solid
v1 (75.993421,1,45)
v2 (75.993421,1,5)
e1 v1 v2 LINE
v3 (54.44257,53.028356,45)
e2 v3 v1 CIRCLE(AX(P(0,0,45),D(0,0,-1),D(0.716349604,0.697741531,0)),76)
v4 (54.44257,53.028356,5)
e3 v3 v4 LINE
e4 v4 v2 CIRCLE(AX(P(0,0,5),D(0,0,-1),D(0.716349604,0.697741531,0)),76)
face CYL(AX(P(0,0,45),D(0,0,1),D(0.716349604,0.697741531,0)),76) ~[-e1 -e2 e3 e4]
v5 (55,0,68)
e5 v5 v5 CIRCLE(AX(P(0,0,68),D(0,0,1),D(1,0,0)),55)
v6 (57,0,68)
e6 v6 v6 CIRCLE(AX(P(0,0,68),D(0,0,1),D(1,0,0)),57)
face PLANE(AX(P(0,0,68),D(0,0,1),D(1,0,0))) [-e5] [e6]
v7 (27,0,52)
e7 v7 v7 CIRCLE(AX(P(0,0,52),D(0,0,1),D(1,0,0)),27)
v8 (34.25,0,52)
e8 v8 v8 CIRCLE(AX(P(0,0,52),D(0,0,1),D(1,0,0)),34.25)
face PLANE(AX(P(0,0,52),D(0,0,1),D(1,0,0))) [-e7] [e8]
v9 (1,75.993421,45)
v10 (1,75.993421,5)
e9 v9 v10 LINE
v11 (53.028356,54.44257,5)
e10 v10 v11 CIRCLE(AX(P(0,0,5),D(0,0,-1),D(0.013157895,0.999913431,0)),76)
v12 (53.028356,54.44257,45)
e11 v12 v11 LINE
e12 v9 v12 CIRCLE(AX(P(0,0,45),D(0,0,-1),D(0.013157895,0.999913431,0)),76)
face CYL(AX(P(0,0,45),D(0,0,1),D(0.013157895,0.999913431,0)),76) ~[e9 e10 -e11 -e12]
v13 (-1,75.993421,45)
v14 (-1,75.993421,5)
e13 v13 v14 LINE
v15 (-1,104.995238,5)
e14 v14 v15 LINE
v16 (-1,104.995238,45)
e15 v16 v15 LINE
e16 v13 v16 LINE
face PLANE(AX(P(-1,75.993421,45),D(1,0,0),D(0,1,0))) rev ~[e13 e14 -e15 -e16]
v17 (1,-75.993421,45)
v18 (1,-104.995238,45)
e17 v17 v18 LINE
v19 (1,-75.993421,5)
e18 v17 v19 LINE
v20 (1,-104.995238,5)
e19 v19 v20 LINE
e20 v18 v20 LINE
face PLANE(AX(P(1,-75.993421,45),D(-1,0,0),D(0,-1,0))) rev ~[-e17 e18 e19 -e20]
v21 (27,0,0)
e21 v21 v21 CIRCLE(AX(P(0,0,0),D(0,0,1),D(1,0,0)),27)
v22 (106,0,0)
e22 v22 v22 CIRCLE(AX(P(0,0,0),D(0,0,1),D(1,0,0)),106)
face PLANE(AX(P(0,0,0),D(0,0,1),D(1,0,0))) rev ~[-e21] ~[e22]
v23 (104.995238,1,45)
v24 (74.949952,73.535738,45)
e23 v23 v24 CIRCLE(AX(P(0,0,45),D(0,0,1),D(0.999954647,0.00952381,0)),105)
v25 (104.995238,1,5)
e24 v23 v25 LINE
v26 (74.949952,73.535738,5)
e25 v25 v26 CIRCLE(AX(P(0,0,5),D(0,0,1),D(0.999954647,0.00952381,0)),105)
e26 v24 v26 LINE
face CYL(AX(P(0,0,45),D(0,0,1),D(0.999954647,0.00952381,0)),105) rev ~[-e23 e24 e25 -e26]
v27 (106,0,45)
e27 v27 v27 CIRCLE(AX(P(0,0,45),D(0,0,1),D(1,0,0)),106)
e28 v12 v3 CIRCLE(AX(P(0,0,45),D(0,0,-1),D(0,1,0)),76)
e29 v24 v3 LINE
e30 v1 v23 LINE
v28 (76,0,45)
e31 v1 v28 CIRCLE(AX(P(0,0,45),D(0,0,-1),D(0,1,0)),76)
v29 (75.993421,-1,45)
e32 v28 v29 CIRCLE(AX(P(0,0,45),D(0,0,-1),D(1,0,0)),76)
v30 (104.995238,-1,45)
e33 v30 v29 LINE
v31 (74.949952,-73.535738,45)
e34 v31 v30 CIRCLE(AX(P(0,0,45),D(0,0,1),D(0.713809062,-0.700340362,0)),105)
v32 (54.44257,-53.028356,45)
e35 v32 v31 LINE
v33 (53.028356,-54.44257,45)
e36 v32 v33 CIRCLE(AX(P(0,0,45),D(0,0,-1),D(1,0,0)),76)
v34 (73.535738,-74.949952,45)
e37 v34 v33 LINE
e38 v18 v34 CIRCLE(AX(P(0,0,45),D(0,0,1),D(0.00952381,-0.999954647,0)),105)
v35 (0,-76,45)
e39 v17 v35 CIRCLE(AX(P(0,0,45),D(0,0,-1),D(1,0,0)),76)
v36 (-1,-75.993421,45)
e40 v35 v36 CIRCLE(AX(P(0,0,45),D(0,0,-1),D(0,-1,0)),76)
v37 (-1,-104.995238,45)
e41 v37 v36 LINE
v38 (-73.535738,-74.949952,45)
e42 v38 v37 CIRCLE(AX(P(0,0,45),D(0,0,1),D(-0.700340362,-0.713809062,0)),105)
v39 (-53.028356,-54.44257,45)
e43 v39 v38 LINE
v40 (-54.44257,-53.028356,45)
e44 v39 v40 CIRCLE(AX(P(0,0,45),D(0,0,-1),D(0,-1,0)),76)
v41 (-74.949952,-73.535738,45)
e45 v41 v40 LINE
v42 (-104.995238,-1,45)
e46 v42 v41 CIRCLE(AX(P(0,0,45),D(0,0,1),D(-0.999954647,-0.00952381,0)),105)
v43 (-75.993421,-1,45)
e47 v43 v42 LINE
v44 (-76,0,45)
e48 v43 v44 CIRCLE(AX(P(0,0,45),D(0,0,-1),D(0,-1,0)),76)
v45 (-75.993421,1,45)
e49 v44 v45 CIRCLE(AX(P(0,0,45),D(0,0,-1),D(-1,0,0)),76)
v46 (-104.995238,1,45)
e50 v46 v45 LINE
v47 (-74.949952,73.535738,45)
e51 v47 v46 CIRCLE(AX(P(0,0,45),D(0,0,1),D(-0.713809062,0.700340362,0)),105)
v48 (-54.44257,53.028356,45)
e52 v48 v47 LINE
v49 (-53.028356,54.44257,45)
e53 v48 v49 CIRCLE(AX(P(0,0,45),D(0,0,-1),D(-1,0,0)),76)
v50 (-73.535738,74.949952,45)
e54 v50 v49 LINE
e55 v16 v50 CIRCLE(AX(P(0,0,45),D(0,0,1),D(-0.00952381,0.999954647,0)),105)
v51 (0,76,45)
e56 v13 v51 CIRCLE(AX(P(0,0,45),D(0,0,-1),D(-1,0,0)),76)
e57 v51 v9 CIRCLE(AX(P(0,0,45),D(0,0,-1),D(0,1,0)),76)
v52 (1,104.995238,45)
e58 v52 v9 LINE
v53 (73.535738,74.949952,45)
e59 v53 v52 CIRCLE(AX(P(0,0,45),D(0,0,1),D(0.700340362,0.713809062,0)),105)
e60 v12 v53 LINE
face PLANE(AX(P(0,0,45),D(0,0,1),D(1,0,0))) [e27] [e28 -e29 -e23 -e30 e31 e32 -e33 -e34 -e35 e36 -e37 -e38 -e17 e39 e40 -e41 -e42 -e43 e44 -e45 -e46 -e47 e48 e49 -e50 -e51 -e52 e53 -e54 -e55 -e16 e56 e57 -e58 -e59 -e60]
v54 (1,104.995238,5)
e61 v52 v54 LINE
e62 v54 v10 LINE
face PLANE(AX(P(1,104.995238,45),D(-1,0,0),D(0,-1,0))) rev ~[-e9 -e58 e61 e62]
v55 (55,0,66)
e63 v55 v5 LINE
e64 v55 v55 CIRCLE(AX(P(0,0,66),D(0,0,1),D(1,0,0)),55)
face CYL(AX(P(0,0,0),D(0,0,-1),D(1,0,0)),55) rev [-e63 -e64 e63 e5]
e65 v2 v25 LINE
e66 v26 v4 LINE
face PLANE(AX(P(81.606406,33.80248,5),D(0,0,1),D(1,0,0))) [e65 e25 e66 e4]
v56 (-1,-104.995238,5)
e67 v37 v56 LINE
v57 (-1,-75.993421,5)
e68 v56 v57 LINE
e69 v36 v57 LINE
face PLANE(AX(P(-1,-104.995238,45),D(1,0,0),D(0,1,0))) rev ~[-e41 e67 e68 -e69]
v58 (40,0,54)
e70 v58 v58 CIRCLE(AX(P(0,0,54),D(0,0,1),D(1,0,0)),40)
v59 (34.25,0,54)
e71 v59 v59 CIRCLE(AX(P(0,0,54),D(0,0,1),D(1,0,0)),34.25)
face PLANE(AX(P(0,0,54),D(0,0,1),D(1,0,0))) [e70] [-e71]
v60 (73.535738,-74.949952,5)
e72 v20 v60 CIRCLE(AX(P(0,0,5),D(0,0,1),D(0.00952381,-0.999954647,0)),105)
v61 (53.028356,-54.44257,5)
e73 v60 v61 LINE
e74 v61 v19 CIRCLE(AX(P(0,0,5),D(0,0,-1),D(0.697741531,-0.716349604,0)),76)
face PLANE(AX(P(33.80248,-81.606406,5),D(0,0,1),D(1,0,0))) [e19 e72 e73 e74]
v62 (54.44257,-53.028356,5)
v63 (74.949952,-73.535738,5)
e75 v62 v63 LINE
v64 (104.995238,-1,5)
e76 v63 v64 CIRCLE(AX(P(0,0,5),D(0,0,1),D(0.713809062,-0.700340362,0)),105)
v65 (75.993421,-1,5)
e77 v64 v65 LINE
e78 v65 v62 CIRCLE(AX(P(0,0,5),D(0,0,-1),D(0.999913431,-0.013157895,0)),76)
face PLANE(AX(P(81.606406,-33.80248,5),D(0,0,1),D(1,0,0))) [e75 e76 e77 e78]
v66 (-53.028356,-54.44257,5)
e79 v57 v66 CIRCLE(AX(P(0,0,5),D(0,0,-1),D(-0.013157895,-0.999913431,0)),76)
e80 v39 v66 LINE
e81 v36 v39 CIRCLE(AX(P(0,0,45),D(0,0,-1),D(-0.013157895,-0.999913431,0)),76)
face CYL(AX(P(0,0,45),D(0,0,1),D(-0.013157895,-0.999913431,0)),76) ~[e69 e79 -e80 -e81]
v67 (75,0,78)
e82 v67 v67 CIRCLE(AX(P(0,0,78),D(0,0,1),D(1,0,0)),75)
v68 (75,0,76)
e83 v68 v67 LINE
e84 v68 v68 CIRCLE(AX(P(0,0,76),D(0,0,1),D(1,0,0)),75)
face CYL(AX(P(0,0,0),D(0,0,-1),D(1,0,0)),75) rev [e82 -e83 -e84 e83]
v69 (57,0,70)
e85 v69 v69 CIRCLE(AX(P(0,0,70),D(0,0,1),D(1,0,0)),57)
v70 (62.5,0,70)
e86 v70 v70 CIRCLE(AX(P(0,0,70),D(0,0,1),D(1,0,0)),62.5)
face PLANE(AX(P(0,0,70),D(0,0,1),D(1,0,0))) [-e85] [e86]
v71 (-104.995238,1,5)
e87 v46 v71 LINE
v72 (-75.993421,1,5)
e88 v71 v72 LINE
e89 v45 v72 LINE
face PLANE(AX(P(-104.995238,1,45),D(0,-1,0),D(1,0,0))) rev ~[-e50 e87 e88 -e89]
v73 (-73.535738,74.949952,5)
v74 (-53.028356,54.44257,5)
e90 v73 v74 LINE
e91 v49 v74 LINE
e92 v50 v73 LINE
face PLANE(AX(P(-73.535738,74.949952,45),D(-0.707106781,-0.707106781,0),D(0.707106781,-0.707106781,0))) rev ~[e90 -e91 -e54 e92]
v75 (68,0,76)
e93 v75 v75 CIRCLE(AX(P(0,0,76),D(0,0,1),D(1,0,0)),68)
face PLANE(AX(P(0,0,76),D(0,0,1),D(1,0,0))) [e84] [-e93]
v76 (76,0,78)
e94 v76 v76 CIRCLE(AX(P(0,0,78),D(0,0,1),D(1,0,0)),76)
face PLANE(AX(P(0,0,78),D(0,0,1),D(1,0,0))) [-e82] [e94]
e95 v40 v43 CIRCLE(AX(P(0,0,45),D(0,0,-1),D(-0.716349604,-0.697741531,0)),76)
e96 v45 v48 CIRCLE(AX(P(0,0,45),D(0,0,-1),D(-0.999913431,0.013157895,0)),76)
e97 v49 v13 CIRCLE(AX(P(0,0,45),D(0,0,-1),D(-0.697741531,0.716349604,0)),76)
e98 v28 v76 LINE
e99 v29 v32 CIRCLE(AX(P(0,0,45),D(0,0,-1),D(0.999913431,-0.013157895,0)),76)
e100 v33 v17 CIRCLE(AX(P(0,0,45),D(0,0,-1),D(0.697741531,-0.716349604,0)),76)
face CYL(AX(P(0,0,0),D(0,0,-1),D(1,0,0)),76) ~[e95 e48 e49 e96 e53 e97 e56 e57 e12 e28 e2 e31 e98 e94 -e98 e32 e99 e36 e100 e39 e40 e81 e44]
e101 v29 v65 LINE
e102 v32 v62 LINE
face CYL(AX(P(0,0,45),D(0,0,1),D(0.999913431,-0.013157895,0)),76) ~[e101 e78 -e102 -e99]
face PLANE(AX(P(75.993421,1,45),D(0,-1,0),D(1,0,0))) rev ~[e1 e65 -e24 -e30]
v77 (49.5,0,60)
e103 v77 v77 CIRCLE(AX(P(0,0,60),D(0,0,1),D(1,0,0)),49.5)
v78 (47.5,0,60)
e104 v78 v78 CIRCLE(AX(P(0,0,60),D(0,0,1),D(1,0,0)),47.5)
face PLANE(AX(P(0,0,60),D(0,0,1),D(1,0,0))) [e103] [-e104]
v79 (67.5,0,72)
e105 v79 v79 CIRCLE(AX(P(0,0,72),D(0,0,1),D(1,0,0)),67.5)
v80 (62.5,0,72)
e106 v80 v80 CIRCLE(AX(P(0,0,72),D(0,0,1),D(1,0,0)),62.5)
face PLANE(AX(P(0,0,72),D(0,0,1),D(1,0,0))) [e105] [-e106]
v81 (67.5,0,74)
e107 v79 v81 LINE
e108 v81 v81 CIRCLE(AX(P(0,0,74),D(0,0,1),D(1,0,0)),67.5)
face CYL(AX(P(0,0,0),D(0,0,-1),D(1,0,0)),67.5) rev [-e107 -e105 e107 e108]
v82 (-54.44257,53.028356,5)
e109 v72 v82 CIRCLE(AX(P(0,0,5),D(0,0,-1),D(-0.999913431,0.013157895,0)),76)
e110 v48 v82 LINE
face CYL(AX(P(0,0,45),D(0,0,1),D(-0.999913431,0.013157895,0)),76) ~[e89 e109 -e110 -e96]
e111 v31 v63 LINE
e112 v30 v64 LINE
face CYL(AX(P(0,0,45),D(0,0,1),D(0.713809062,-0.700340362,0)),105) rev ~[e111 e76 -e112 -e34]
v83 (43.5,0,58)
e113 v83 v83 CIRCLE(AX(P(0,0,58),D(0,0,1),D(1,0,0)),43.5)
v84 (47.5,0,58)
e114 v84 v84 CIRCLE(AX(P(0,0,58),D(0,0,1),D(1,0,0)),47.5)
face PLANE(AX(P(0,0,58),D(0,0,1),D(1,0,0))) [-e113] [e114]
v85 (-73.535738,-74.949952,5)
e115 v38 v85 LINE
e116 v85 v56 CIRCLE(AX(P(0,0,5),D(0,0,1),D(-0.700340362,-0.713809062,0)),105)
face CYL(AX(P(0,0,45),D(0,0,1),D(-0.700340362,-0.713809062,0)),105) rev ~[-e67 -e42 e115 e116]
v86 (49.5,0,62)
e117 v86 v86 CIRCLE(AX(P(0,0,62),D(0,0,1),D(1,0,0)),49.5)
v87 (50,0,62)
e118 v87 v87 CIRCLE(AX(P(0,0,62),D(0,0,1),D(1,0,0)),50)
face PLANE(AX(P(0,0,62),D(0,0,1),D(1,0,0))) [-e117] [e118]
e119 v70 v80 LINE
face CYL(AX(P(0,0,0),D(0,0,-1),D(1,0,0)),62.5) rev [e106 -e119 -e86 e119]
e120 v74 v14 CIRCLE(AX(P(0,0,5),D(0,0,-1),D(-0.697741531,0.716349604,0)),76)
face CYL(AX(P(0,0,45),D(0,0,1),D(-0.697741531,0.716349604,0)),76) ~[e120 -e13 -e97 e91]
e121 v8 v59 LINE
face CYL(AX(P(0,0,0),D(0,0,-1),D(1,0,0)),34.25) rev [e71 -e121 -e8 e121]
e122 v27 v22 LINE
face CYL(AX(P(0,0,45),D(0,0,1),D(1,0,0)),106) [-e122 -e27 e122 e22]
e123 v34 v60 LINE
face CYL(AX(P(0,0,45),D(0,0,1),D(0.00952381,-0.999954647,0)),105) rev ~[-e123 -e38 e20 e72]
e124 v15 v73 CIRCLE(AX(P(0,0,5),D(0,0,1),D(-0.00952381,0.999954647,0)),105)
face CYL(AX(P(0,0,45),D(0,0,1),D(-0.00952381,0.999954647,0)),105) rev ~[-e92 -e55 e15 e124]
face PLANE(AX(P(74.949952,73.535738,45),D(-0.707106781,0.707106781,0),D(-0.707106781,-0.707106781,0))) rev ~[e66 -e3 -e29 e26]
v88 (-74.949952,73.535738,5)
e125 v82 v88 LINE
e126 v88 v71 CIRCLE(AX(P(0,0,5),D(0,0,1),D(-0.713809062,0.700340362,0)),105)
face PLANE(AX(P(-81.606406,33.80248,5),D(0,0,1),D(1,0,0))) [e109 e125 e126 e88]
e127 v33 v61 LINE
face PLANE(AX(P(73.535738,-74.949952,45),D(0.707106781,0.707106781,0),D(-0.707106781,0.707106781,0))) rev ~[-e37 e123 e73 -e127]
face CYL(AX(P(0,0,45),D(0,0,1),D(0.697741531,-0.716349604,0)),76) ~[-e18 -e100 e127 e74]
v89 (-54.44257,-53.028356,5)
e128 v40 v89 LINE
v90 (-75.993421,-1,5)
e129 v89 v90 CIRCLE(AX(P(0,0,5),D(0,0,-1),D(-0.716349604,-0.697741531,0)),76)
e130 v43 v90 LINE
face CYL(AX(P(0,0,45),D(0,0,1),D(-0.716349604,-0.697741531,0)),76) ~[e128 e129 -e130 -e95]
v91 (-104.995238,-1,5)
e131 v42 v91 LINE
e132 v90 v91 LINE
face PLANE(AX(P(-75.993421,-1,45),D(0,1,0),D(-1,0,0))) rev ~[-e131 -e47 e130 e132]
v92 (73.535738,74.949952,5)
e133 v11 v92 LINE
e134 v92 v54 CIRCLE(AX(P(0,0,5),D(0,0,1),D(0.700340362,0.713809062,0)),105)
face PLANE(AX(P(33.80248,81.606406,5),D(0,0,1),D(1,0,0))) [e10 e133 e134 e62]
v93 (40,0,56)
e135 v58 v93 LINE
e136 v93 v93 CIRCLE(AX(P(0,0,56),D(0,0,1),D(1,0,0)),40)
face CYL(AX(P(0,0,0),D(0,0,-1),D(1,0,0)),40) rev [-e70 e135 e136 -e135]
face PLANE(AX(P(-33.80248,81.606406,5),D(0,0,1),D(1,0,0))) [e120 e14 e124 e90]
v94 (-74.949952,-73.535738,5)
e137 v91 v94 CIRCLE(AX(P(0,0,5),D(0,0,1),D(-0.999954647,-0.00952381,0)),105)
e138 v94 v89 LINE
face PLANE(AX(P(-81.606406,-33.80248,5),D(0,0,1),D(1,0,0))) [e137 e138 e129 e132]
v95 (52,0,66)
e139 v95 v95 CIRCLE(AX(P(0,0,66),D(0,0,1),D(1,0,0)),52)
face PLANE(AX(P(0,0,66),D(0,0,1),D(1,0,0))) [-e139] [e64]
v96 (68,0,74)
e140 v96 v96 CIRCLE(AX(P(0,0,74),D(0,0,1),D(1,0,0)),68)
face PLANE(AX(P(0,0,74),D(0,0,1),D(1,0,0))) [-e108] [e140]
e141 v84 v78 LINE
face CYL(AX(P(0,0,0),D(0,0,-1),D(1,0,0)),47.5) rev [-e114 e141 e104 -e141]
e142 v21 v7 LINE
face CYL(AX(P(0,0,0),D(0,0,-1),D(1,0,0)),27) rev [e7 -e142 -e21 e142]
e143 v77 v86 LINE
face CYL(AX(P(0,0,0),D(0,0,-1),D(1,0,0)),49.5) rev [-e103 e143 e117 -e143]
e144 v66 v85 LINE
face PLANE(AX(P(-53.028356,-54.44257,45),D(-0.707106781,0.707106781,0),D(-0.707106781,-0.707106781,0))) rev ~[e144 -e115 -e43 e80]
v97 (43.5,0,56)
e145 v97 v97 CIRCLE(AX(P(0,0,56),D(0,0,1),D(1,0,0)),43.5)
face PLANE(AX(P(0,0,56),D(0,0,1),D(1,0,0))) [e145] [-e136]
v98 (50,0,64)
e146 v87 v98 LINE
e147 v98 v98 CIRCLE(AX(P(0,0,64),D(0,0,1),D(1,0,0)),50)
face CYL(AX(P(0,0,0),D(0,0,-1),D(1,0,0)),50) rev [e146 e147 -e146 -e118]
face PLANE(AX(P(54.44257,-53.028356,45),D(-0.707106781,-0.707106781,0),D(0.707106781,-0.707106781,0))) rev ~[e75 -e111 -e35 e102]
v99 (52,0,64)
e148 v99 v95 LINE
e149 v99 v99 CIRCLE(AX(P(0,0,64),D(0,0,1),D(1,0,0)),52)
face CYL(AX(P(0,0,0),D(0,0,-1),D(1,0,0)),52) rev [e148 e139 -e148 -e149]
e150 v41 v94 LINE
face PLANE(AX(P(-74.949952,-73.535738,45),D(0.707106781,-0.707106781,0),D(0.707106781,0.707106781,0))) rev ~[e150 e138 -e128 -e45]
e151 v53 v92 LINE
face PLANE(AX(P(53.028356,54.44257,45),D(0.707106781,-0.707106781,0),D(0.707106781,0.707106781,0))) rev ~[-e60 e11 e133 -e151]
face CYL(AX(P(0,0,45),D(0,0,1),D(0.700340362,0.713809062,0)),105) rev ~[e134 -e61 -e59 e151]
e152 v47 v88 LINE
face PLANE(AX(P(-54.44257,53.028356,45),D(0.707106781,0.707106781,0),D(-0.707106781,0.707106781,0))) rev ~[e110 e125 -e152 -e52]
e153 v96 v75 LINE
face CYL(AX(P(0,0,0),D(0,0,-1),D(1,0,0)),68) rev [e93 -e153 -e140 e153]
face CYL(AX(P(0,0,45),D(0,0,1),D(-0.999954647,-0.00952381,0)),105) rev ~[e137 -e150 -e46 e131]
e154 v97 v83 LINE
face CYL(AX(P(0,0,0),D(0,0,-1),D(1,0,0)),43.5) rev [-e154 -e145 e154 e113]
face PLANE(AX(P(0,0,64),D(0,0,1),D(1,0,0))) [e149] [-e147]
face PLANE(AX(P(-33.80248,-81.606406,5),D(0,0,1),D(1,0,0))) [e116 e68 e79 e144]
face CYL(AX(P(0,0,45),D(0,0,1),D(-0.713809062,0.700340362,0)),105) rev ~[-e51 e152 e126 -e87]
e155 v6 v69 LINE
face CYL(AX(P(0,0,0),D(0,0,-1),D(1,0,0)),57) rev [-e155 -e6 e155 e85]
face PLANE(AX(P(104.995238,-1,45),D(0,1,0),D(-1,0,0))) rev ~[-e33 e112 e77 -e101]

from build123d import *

# Parameters (mm, degrees)
F0_R      = 34.25
F0_R_2    = 27
F1_DEPTH  = 52
F2_R      = 40
F2_R_2    = 34.25
F3_DEPTH  = 54
F4_R      = 43.5
F4_R_2    = 40
F5_DEPTH  = 56
F6_R      = 47.5
F6_R_2    = 43.5
F7_DEPTH  = 58
F8_R      = 49.5
F8_R_2    = 47.5
F9_DEPTH  = 60
F10_R     = 50
F10_R_2   = 49.5
F11_DEPTH = 62
F12_R     = 52
F12_R_2   = 50
F13_DEPTH = 64
F14_R     = 55
F14_R_2   = 52
F15_DEPTH = 66
F16_R     = 57
F16_R_2   = 55
F17_DEPTH = 68
F18_R     = 62.5
F18_R_2   = 57
F19_DEPTH = 70
F20_R     = 67.5
F20_R_2   = 62.5
F21_DEPTH = 72
F22_R     = 68
F22_R_2   = 67.5
F23_DEPTH = 74
F24_R     = 75
F24_R_2   = 68
F25_DEPTH = 76
F26_R     = 76
F26_R_2   = 75
F27_DEPTH = 78
F29_DEPTH = 45
F30_R     = 106
F31_DEPTH = 45
F32_DEPTH = 40


# Not quite as in the source:
# - after a boolean that leaves OpenCascade's solid faulty, fix() repairs it


with BuildPart() as f1:
    # F0 (on Top) → F1 (new body)
    with BuildSketch(Plane.XY):
        Circle(F0_R)
        Circle(F0_R_2, mode=Mode.SUBTRACT)
    extrude(amount=F1_DEPTH)

    # F2 (on Top) → F3 (join)
    with BuildSketch(Plane.XY):
        Circle(F2_R)
        Circle(F2_R_2, mode=Mode.SUBTRACT)
    extrude(amount=F3_DEPTH)

    # F4 (on Top) → F5 (join)
    with BuildSketch(Plane.XY):
        Circle(F4_R)
        Circle(F4_R_2, mode=Mode.SUBTRACT)
    extrude(amount=F5_DEPTH)

    # F6 (on Top) → F7 (join)
    with BuildSketch(Plane.XY):
        Circle(F6_R)
        Circle(F6_R_2, mode=Mode.SUBTRACT)
    extrude(amount=F7_DEPTH)

    # F8 (on Top) → F9 (join)
    with BuildSketch(Plane.XY):
        Circle(F8_R)
        Circle(F8_R_2, mode=Mode.SUBTRACT)
    extrude(amount=F9_DEPTH)

    # F10 (on Top) → F11 (join)
    with BuildSketch(Plane.XY):
        Circle(F10_R)
        Circle(F10_R_2, mode=Mode.SUBTRACT)
    extrude(amount=F11_DEPTH)

    # F12 (on Top) → F13 (join)
    with BuildSketch(Plane.XY):
        Circle(F12_R)
        Circle(F12_R_2, mode=Mode.SUBTRACT)
    extrude(amount=F13_DEPTH)

    # F14 (on Top) → F15 (join)
    with BuildSketch(Plane.XY):
        Circle(F14_R)
        Circle(F14_R_2, mode=Mode.SUBTRACT)
    extrude(amount=F15_DEPTH)

    # F16 (on Top) → F17 (join)
    with BuildSketch(Plane.XY):
        Circle(F16_R)
        Circle(F16_R_2, mode=Mode.SUBTRACT)
    extrude(amount=F17_DEPTH)

    # F18 (on Top) → F19 (join)
    with BuildSketch(Plane.XY):
        Circle(F18_R)
        Circle(F18_R_2, mode=Mode.SUBTRACT)
    extrude(amount=F19_DEPTH)

    # F20 (on Top) → F21 (join)
    with BuildSketch(Plane.XY):
        Circle(F20_R)
        Circle(F20_R_2, mode=Mode.SUBTRACT)
    extrude(amount=F21_DEPTH)

    # F22 (on Top) → F23 (join)
    with BuildSketch(Plane.XY):
        Circle(F22_R)
        Circle(F22_R_2, mode=Mode.SUBTRACT)
    extrude(amount=F23_DEPTH)

    # F24 (on Top) → F25 (join)
    with BuildSketch(Plane.XY):
        Circle(F24_R)
        Circle(F24_R_2, mode=Mode.SUBTRACT)
    extrude(amount=F25_DEPTH)

    # F26 (on Top) → F27 (join)
    with BuildSketch(Plane.XY):
        Circle(F26_R)
        Circle(F26_R_2, mode=Mode.SUBTRACT)
    extrude(amount=F27_DEPTH)

    # F28 (on Top) → F29 (join)
    with BuildSketch(Plane.XY):
        with BuildLine():
            Line((105, 0), (76, 0))
            ThreePointArc((76, 0), (69.7127627842, -30.267651131), (51.8912972371, -55.5274100877))
            Line((51.8912972371, -55.5274100877), (72.4058930172, -76.0420058677))
            ThreePointArc((72.4058930172, -76.0420058677), (96.5080793685, -41.366539819), (105, 0))
        make_face()
        with BuildLine():
            ThreePointArc((55.5274100877, 51.8912972371), (70.6968286653, 27.8919059347), (76, 0))
            Line((76, 0), (105, 0))
            ThreePointArc((105, 0), (97.492078181, 38.9909565405), (76.0420058677, 72.4058930172))
            Line((76.0420058677, 72.4058930172), (55.5274100877, 51.8912972371))
        make_face()
        with BuildLine():
            ThreePointArc((0, 76), (30.267651131, 69.7127627842), (55.5274100877, 51.8912972371))
            Line((55.5274100877, 51.8912972371), (76.0420058677, 72.4058930172))
            ThreePointArc((76.0420058677, 72.4058930172), (41.366539819, 96.5080793685), (0, 105))
            Line((0, 105), (0, 76))
        make_face()
        with BuildLine():
            Line((72.4058930172, -76.0420058677), (51.8912972371, -55.5274100877))
            ThreePointArc((51.8912972371, -55.5274100877), (27.8919059347, -70.6968286653), (0, -76))
            Line((0, -76), (0, -105))
            ThreePointArc((0, -105), (38.9909565405, -97.492078181), (72.4058930172, -76.0420058677))
        make_face()
        with BuildLine():
            ThreePointArc((-51.8912972371, 55.5274100877), (-27.8919059347, 70.6968286653), (0, 76))
            Line((0, 76), (0, 105))
            ThreePointArc((0, 105), (-38.9909565405, 97.492078181), (-72.4058930172, 76.0420058677))
            Line((-72.4058930172, 76.0420058677), (-51.8912972371, 55.5274100877))
        make_face()
        with BuildLine():
            Line((0, -105), (0, -76))
            ThreePointArc((0, -76), (-30.267651131, -69.7127627842), (-55.5274100877, -51.8912972371))
            Line((-55.5274100877, -51.8912972371), (-76.0420058677, -72.4058930172))
            ThreePointArc((-76.0420058677, -72.4058930172), (-41.366539819, -96.5080793685), (0, -105))
        make_face()
        with BuildLine():
            ThreePointArc((-76, 0), (-69.7127627842, 30.267651131), (-51.8912972371, 55.5274100877))
            Line((-51.8912972371, 55.5274100877), (-72.4058930172, 76.0420058677))
            ThreePointArc((-72.4058930172, 76.0420058677), (-96.5080793685, 41.366539819), (-105, 0))
            Line((-105, 0), (-76, 0))
        make_face()
        with BuildLine():
            Line((-76.0420058677, -72.4058930172), (-55.5274100877, -51.8912972371))
            ThreePointArc((-55.5274100877, -51.8912972371), (-70.6968286653, -27.8919059347), (-76, 0))
            Line((-76, 0), (-105, 0))
            ThreePointArc((-105, 0), (-97.492078181, -38.9909565405), (-76.0420058677, -72.4058930172))
        make_face()
    extrude(amount=F29_DEPTH)

    # F30 (on face) → F31 (join)
    with BuildSketch(Plane.XY.offset(45)):
        Circle(F30_R)
        with BuildLine():
            ThreePointArc((74.9499515543, 73.5357379919), (97.0073509137, 40.1817603983), (104.9952379873, 1))
            ThreePointArc((104.9952379873, 1), (104.9988094901, 0.5000056692), (105, 0))
            ThreePointArc((105, 0), (104.9988094901, -0.5000056692), (104.9952379873, -1))
            ThreePointArc((104.9952379873, -1), (97.0073509137, -40.1817603983), (74.9499515543, -73.5357379919))
            ThreePointArc((74.9499515543, -73.5357379919), (74.2462120246, -74.2462120246), (73.5357379919, -74.9499515543))
            ThreePointArc((73.5357379919, -74.9499515543), (40.1817603983, -97.0073509137), (1, -104.9952379873))
            ThreePointArc((1, -104.9952379873), (0, -105), (-1, -104.9952379873))
            ThreePointArc((-1, -104.9952379873), (-40.1817603983, -97.0073509137), (-73.5357379919, -74.9499515543))
            ThreePointArc((-73.5357379919, -74.9499515543), (-74.2462120246, -74.2462120246), (-74.9499515543, -73.5357379919))
            ThreePointArc((-74.9499515543, -73.5357379919), (-97.0073509137, -40.1817603983), (-104.9952379873, -1))
            ThreePointArc((-104.9952379873, -1), (-105, 0), (-104.9952379873, 1))
            ThreePointArc((-104.9952379873, 1), (-97.0073509137, 40.1817603983), (-74.9499515543, 73.5357379919))
            ThreePointArc((-74.9499515543, 73.5357379919), (-74.2462120246, 74.2462120246), (-73.5357379919, 74.9499515543))
            ThreePointArc((-73.5357379919, 74.9499515543), (-40.1817603983, 97.0073509137), (-1, 104.9952379873))
            ThreePointArc((-1, 104.9952379873), (0, 105), (1, 104.9952379873))
            ThreePointArc((1, 104.9952379873), (40.1817603983, 97.0073509137), (73.5357379919, 74.9499515543))
            ThreePointArc((73.5357379919, 74.9499515543), (74.2462120246, 74.2462120246), (74.9499515543, 73.5357379919))
        make_face(mode=Mode.SUBTRACT)
    extrude(amount=-F31_DEPTH)

    # F30 (on face) → F32 (cut)
    with BuildSketch(Plane.XY.offset(45)):
        with BuildLine():
            Line((-74.9499515543, -73.5357379919), (-54.4425699317, -53.0283563693))
            ThreePointArc((-54.4425699317, -53.0283563693), (-70.2148444709, -29.0839408597), (-75.9934207679, -1))
            Line((-75.9934207679, -1), (-104.9952379873, -1))
            ThreePointArc((-104.9952379873, -1), (-97.0073509137, -40.1817603983), (-74.9499515543, -73.5357379919))
        make_face()
        with BuildLine():
            ThreePointArc((-75.9934207679, 1), (-70.2148444709, 29.0839408597), (-54.4425699317, 53.0283563693))
            Line((-54.4425699317, 53.0283563693), (-74.9499515543, 73.5357379919))
            ThreePointArc((-74.9499515543, 73.5357379919), (-97.0073509137, 40.1817603983), (-104.9952379873, 1))
            Line((-104.9952379873, 1), (-75.9934207679, 1))
        make_face()
        with BuildLine():
            ThreePointArc((-53.0283563693, 54.4425699317), (-29.0839408597, 70.2148444709), (-1, 75.9934207679))
            Line((-1, 75.9934207679), (-1, 104.9952379873))
            ThreePointArc((-1, 104.9952379873), (-40.1817603983, 97.0073509137), (-73.5357379919, 74.9499515543))
            Line((-73.5357379919, 74.9499515543), (-53.0283563693, 54.4425699317))
        make_face()
        with BuildLine():
            ThreePointArc((1, 75.9934207679), (29.0839408597, 70.2148444709), (53.0283563693, 54.4425699317))
            Line((53.0283563693, 54.4425699317), (73.5357379919, 74.9499515543))
            ThreePointArc((73.5357379919, 74.9499515543), (40.1817603983, 97.0073509137), (1, 104.9952379873))
            Line((1, 104.9952379873), (1, 75.9934207679))
        make_face()
        with BuildLine():
            ThreePointArc((54.4425699317, 53.0283563693), (70.2148444709, 29.0839408597), (75.9934207679, 1))
            Line((75.9934207679, 1), (104.9952379873, 1))
            ThreePointArc((104.9952379873, 1), (97.0073509137, 40.1817603983), (74.9499515543, 73.5357379919))
            Line((74.9499515543, 73.5357379919), (54.4425699317, 53.0283563693))
        make_face()
        with BuildLine():
            Line((104.9952379873, -1), (75.9934207679, -1))
            ThreePointArc((75.9934207679, -1), (70.2148444709, -29.0839408597), (54.4425699317, -53.0283563693))
            Line((54.4425699317, -53.0283563693), (74.9499515543, -73.5357379919))
            ThreePointArc((74.9499515543, -73.5357379919), (97.0073509137, -40.1817603983), (104.9952379873, -1))
        make_face()
        with BuildLine():
            Line((73.5357379919, -74.9499515543), (53.0283563693, -54.4425699317))
            ThreePointArc((53.0283563693, -54.4425699317), (29.0839408597, -70.2148444709), (1, -75.9934207679))
            Line((1, -75.9934207679), (1, -104.9952379873))
            ThreePointArc((1, -104.9952379873), (40.1817603983, -97.0073509137), (73.5357379919, -74.9499515543))
        make_face()
        with BuildLine():
            Line((-1, -104.9952379873), (-1, -75.9934207679))
            ThreePointArc((-1, -75.9934207679), (-29.0839408597, -70.2148444709), (-53.0283563693, -54.4425699317))
            Line((-53.0283563693, -54.4425699317), (-73.5357379919, -74.9499515543))
            ThreePointArc((-73.5357379919, -74.9499515543), (-40.1817603983, -97.0073509137), (-1, -104.9952379873))
        make_face()
    extrude(amount=-F32_DEPTH, mode=Mode.SUBTRACT)

    add(f1.part.fix(), mode=Mode.REPLACE)


solid = f1.part
